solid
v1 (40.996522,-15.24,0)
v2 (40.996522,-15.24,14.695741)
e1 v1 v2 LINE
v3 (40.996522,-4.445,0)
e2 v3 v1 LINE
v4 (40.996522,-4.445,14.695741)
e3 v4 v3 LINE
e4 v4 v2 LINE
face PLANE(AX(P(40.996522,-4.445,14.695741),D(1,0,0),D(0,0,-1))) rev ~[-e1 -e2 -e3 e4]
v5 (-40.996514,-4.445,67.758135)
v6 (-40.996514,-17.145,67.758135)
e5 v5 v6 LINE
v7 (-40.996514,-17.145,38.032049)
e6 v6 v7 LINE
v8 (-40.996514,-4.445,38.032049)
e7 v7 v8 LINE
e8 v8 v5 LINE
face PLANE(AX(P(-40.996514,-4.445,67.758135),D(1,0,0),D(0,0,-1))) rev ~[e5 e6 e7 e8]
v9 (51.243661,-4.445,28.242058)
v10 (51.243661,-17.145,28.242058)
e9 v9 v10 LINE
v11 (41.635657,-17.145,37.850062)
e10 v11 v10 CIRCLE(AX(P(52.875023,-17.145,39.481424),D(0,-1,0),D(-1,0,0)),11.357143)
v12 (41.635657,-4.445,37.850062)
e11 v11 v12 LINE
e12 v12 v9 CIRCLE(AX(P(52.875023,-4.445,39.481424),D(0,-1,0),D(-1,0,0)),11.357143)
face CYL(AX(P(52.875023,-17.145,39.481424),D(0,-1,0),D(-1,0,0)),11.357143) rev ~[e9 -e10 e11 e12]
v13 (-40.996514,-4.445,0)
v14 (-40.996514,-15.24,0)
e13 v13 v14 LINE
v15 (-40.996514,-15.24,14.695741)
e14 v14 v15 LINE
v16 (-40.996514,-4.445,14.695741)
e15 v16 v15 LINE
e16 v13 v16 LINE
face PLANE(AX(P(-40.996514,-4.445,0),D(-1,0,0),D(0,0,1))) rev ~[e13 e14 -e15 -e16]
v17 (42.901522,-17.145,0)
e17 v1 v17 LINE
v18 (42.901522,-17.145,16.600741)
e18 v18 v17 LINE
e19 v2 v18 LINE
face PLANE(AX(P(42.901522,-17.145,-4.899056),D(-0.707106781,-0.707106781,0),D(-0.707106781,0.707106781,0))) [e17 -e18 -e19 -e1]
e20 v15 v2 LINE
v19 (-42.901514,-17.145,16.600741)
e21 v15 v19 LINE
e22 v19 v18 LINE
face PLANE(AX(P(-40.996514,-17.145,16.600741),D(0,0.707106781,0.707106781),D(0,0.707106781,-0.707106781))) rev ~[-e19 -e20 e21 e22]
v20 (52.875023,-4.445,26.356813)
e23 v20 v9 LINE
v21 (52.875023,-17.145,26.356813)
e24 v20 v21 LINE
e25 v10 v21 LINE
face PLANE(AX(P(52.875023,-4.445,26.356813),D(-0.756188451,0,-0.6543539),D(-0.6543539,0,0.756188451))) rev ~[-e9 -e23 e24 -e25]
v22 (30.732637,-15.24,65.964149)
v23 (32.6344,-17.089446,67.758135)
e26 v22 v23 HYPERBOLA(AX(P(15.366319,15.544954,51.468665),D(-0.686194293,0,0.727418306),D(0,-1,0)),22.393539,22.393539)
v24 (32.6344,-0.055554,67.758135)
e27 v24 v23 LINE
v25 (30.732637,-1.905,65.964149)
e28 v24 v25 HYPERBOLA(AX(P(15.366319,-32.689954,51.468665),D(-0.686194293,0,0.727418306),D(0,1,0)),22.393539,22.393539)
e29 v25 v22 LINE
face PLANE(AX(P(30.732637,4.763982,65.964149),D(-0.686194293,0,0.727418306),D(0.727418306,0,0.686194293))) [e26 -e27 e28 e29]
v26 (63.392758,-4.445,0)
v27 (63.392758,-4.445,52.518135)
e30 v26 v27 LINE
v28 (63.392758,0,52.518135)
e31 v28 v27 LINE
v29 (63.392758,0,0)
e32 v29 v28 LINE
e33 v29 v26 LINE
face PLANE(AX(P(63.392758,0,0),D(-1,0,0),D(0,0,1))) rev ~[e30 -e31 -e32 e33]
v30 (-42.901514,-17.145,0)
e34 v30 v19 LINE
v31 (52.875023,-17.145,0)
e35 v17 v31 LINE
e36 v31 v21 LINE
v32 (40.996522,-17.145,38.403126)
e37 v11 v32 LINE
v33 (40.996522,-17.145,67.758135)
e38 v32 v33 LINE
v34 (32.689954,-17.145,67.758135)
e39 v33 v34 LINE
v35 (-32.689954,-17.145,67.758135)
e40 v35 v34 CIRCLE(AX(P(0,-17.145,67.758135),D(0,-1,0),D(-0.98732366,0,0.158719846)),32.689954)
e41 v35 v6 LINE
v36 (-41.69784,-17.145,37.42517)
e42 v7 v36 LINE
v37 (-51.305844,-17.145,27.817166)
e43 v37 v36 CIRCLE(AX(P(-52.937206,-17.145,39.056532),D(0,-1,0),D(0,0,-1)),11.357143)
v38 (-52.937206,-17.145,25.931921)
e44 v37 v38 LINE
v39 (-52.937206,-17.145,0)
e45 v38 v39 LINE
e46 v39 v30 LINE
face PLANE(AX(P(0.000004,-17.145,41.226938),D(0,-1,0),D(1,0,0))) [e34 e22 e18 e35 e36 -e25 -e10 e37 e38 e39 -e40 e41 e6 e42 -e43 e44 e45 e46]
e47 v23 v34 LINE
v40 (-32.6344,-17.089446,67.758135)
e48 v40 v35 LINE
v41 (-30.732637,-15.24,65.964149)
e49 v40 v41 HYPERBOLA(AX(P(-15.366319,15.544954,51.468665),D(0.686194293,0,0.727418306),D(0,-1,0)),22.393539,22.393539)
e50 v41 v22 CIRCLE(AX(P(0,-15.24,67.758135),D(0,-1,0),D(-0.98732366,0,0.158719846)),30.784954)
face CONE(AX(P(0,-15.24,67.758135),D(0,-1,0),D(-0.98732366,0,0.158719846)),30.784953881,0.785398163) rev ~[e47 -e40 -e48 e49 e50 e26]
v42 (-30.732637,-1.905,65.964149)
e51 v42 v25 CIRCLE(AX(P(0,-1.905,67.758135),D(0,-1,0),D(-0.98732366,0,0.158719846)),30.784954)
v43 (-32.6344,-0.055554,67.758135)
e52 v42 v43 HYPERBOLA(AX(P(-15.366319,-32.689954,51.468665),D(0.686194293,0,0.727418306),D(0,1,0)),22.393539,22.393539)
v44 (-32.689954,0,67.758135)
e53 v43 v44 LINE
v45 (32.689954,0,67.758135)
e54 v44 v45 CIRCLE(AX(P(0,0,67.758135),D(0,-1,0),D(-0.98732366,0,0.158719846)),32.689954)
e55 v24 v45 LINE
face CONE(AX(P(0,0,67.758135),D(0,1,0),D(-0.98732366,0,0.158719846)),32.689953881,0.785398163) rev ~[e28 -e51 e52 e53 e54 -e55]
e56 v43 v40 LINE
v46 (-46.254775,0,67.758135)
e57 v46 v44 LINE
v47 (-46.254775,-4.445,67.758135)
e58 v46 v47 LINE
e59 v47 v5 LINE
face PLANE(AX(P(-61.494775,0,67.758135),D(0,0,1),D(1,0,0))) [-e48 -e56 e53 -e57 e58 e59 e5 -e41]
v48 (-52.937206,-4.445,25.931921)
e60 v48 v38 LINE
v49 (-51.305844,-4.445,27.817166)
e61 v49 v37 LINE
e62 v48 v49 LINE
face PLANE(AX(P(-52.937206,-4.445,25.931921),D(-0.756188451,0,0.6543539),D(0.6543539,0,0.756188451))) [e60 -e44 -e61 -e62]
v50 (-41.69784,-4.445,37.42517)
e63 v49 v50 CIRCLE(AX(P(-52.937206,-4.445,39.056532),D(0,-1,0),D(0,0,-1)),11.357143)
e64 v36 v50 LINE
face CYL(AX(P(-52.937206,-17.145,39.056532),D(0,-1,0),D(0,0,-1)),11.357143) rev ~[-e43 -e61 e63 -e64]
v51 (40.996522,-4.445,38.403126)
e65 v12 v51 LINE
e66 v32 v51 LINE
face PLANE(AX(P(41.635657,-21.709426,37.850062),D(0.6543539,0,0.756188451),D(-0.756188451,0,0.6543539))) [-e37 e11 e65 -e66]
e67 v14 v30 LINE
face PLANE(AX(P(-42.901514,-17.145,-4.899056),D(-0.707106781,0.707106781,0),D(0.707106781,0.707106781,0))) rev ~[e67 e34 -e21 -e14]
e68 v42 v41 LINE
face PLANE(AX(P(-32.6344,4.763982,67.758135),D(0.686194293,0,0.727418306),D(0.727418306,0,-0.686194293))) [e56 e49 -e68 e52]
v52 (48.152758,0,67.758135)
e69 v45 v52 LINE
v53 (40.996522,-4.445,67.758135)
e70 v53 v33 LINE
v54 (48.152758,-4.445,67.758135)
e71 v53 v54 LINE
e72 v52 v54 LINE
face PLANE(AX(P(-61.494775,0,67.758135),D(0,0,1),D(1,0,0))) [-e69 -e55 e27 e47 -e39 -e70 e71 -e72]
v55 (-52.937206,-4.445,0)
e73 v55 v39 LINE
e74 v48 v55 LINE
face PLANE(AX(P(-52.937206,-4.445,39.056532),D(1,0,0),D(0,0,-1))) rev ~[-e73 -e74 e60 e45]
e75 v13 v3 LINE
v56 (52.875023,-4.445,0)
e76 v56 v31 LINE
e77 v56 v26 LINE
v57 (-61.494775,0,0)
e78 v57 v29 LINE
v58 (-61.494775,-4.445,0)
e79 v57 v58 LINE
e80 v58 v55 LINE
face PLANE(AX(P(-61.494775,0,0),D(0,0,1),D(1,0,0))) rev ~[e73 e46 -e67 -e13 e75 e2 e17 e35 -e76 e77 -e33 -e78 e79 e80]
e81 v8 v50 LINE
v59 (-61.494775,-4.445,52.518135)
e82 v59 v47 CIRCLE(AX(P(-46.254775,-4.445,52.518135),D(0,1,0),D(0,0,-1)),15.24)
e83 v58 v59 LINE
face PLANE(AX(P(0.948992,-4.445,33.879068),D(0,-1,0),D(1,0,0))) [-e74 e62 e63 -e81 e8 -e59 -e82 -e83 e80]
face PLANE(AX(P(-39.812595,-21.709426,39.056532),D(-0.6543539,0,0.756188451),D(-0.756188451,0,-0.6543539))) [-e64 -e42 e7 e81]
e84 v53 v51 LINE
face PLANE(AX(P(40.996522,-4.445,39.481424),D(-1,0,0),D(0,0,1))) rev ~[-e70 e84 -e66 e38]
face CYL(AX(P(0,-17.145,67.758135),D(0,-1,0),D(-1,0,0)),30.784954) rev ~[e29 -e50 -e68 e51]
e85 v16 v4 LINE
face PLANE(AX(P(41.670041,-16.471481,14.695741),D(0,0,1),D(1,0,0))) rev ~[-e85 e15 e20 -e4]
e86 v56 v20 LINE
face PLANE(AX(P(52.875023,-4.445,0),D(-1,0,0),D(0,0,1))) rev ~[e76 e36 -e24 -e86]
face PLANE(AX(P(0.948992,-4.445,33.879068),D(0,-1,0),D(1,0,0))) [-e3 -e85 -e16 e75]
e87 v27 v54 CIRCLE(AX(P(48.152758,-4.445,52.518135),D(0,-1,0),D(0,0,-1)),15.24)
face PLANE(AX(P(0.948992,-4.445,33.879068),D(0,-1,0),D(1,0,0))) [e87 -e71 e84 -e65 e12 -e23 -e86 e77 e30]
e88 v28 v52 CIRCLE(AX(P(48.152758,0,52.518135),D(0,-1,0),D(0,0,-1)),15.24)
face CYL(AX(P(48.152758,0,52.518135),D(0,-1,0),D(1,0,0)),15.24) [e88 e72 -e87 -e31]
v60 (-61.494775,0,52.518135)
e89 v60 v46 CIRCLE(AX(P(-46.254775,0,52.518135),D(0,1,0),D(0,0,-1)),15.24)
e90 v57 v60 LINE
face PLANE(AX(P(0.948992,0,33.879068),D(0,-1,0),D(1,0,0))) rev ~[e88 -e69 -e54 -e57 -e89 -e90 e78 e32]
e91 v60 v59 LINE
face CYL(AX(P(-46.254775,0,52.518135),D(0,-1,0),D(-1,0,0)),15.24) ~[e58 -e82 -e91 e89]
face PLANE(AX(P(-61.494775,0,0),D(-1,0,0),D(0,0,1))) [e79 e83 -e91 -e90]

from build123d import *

# Parameters (mm, degrees)
F0_W         = 124.8875334859
F0_H         = 67.7581354976
F1_DEPTH     = 4.445
F2_R         = 15.24
F4_DEPTH     = 12.7
F6_DEPTH     = 50.8
F8_DEPTH     = 12.7
F9_T1_DEPTH  = 26.6729642247
F9_T3_DEPTH  = 19.5947973283
F9_T5_DEPTH  = 81.9930359721
F9_T7_DEPTH  = 17.2644261819
F9_T10_ANGLE = 198.2651986278
F9_T12_ANGLE = 198.2651986278
F9_T16_DEPTH = 17.2644261819
F9_T21_DEPTH = 17.2644261819
F9_T27_DEPTH = 86.8920920642
F9_T31_DEPTH = 19.5947973283
F9_T38_DEPTH = 19.5947973283
F9_T42_DEPTH = 86.8920920642


# Not quite as in the source:
# - a fillet or chamfer that OpenCascade refuses, or shapes differently, is made with other operations: its cross-section is extruded or revolved along the edge and cut away or added


with BuildPart() as f1:
    # F0 (on Front) → F1 (new body)
    with BuildSketch(Plane.XZ):
        with Locations((0.9489916265, 33.8790677488)):
            Rectangle(F0_W, F0_H)
    extrude(amount=F1_DEPTH)

    # F2
    f2_edges = [f1.edges().sort_by_distance(p)[0] for p in [
        (-61.494775, -2.2225, 67.758135),
        (63.392758, -2.2225, 67.758135),
    ]]
    fillet(f2_edges, radius=F2_R)

    # F3 (on face) → F4 (join)
    with BuildSketch(Plane.XZ.offset(4.445)):
        Polygon((40.9965217113, 67.7581354976), (-40.9965142608, 67.7581354976), (-40.9965142608, 39.0565320849), (-40.9965142608, 14.6957412362), (40.9965217113, 14.6957412362), (40.9965217113, 39.4814237952), align=None)
        Polygon((-40.9965142608, 14.6957412362), (-40.9965142608, 39.0565320849), (-52.9372058809, 39.0565320849), (-52.9372058809, 0), (-40.9965142608, 0), align=None)
        Polygon((52.8750233352, 39.4814237952), (40.9965217113, 39.4814237952), (40.9965217113, 14.6957412362), (40.9965217113, 0), (52.8750233352, 0), align=None)
    extrude(amount=F4_DEPTH)

    # F5 (on face) → F6 (cut)
    with BuildSketch(Plane.XZ.offset(17.145)):
        with BuildLine():
            ThreePointArc((-30.7849538809, 67.7581354976), (0, 36.9731816167), (30.7849538809, 67.7581354976))
            Line((30.7849538809, 67.7581354976), (-30.7849538809, 67.7581354976))
        make_face()
        with BuildLine():
            Line((-30.7849538809, 67.7581354976), (30.7849538809, 67.7581354976))
            ThreePointArc((30.7849538809, 67.7581354976), (0, 98.5430893784), (-30.7849538809, 67.7581354976))
        make_face()
    extrude(amount=-F6_DEPTH, mode=Mode.SUBTRACT)

    # F7 (on face) → F8 (cut)
    with BuildSketch(Plane.XZ.offset(17.145)):
        with BuildLine():
            ThreePointArc((-52.9372058809, 27.6993892785), (-44.9064931875, 31.0258193916), (-41.5800630744, 39.0565320849))
            Line((-41.5800630744, 39.0565320849), (-52.9372058809, 39.0565320849))
            Line((-52.9372058809, 39.0565320849), (-52.9372058809, 27.6993892785))
        make_face()
        with BuildLine():
            Line((52.8750233352, 39.4814237952), (41.5178805288, 39.4814237952))
            ThreePointArc((41.5178805288, 39.4814237952), (44.8443106419, 31.4507111019), (52.8750233352, 28.1242809888))
            Line((52.8750233352, 28.1242809888), (52.8750233352, 39.4814237952))
        make_face()
    extrude(amount=-F8_DEPTH, mode=Mode.SUBTRACT)

    # F9: chamfer of 1.905 on 11 edges, made by hand

    # F9_s2 → F9_t1 (cut)
    with BuildSketch(Plane.XZ.offset(-4.7639821123)):
        with BuildLine():
            Line((-32.6343999444, 67.7581354976), (-30.7326373381, 65.964148961))
            ThreePointArc((-30.7326373381, 65.964148961), (-30.7710738122, 66.8337968736), (-30.7849538809, 67.7581354976))
            Line((-30.7849538809, 67.7581354976), (-32.6343999444, 67.7581354976))
        make_face()
        with BuildLine():
            Line((30.7326373381, 65.964148961), (32.6343999444, 67.7581354976))
            Line((32.6343999444, 67.7581354976), (30.7849538809, 67.7581354976))
            ThreePointArc((30.7849538809, 67.7581354976), (30.7710738122, 66.8337968736), (30.7326373381, 65.964148961))
        make_face()
    extrude(amount=F9_T1_DEPTH, mode=Mode.SUBTRACT)

    # F9_s4 → F9_t3 (cut)
    with BuildSketch(Plane.XY.offset(-4.8990560921)):
        Polygon((-42.9015142608, -17.145), (-40.9965142608, -15.24), (-40.9965142608, -17.145), align=None)
        Polygon((42.9015217113, -17.145), (40.9965217113, -15.24), (40.9965217113, -17.145), align=None)
    extrude(amount=F9_T3_DEPTH, mode=Mode.SUBTRACT)

    # F9_s6 → F9_t5 (cut)
    with BuildSketch(Plane.YZ.offset(-40.9965142608)):
        Polygon((-17.145, 16.6007412362), (-15.24, 14.6957412362), (-17.145, 14.6957412362), align=None)
    extrude(amount=F9_T5_DEPTH, mode=Mode.SUBTRACT)

    # F9_s8 → F9_t7 (cut)
    with BuildSketch(Plane.XZ.offset(4.445)):
        with BuildLine():
            Line((52.8750233352, 26.356813065), (51.2436612422, 28.24205769))
            ThreePointArc((51.2436612422, 28.24205769), (52.0302167258, 28.1557452496), (52.8750233352, 28.1242809888))
            Line((52.8750233352, 28.1242809888), (52.8750233352, 26.356813065))
        make_face()
        with BuildLine():
            Line((-52.9372058809, 25.9319213547), (-51.3058437879, 27.8171659797))
            ThreePointArc((-51.3058437879, 27.8171659797), (-52.0923992715, 27.7308535393), (-52.9372058809, 27.6993892785))
            Line((-52.9372058809, 27.6993892785), (-52.9372058809, 25.9319213547))
        make_face()
    extrude(amount=F9_T7_DEPTH, mode=Mode.SUBTRACT)

    # F9_s9 → F9_t10 (revolve, cut)
    with BuildSketch(Plane(origin=(10.6182323587, 0, 66.0511732612), x_dir=(0, 1, 0), z_dir=(0.1587198459, 0, 0.9873236605))):
        Polygon((-15.24, 41.539514704), (-17.145, 43.444514704), (-17.145, 41.539514704), align=None)
    revolve(axis=Axis((0, -17.145, 67.7581354976), (0, -1, 0)), revolution_arc=F9_T10_ANGLE, mode=Mode.SUBTRACT)

    # F9_s11 → F9_t12 (revolve, cut)
    with BuildSketch(Plane(origin=(10.6182323587, 0, 66.0511732612), x_dir=(0, 1, 0), z_dir=(0.1587198459, 0, 0.9873236605))):
        Polygon((0, 43.444514704), (-1.905, 41.539514704), (0, 41.539514704), align=None)
    revolve(axis=Axis((0, 0, 67.7581354976), (0, -1, 0)), revolution_arc=F9_T12_ANGLE, mode=Mode.SUBTRACT)


with BuildPart() as f9_tool14:
    # F9_s15 → F9_t16 (new body)
    with BuildSketch(Plane.XZ.offset(21.7094261819)):
        with BuildLine():
            Line((41.63565723, 37.8500617022), (39.750412605, 39.4814237952))
            Line((39.750412605, 39.4814237952), (41.5178805288, 39.4814237952))
            ThreePointArc((41.5178805288, 39.4814237952), (41.5493447896, 38.6366171858), (41.63565723, 37.8500617022))
        make_face()
    extrude(amount=-F9_T16_DEPTH)

    split(bisect_by=Plane.YZ.offset(40.9965217113), keep=Keep.TOP)


with BuildPart() as f1_1:
    add(f1.part)

    # F9_t13: cut F9_tool14
    add(f9_tool14.part, mode=Mode.SUBTRACT)


with BuildPart() as f9_tool19:
    # F9_s20 → F9_t21 (new body)
    with BuildSketch(Plane.XZ.offset(21.7094261819)):
        with BuildLine():
            Line((-39.8125951507, 39.0565320849), (-41.6978397756, 37.4251699919))
            ThreePointArc((-41.6978397756, 37.4251699919), (-41.6115273352, 38.2117254755), (-41.5800630744, 39.0565320849))
            Line((-41.5800630744, 39.0565320849), (-39.8125951507, 39.0565320849))
        make_face()
    extrude(amount=-F9_T21_DEPTH)

    split(bisect_by=Plane.YZ.offset(-40.9965142608), keep=Keep.BOTTOM)


with BuildPart() as f1_2:
    add(f1_1.part)

    # F9_t18: cut F9_tool19
    add(f9_tool19.part, mode=Mode.SUBTRACT)


with BuildPart() as f9_tool25:
    # F9_s26 → F9_t27 (new body)
    with BuildSketch(Plane.YZ.offset(-45.8955703528)):
        Polygon((-17.145, 16.6007412362), (-15.24, 14.6957412362), (-17.145, 14.6957412362), align=None)
    extrude(amount=F9_T27_DEPTH)

    split(bisect_by=Plane.YZ.offset(-40.9965142608), keep=Keep.BOTTOM)


with BuildPart() as f9_tool29:
    # F9_s30 → F9_t31 (new body)
    with BuildSketch(Plane.XY):
        Polygon((-42.9015142608, -17.145), (-40.9965142608, -15.24), (-40.9965142608, -17.145), align=None)
    extrude(amount=F9_T31_DEPTH)

    split(bisect_by=Plane.XY.offset(14.6957412362), keep=Keep.TOP)


with BuildPart() as f9_tool25_1:
    add(f9_tool25.part)

    # F9_t33: intersect F9_tool29
    add(f9_tool29.part, mode=Mode.INTERSECT)


with BuildPart() as f1_3:
    add(f1_2.part)

    # F9_t23: cut F9_tool25
    add(f9_tool25_1.part, mode=Mode.SUBTRACT)


with BuildPart() as f9_tool36:
    # F9_s37 → F9_t38 (new body)
    with BuildSketch(Plane.XY.offset(19.5947973283)):
        Polygon((42.9015217113, -17.145), (40.9965217113, -15.24), (40.9965217113, -17.145), align=None)
    extrude(amount=-F9_T38_DEPTH)

    split(bisect_by=Plane.XY.offset(14.6957412362), keep=Keep.TOP)


with BuildPart() as f9_tool40:
    # F9_s41 → F9_t42 (new body)
    with BuildSketch(Plane.YZ.offset(-40.9965142608)):
        Polygon((-17.145, 16.6007412362), (-15.24, 14.6957412362), (-17.145, 14.6957412362), align=None)
    extrude(amount=F9_T42_DEPTH)

    split(bisect_by=Plane.YZ.offset(40.9965217113), keep=Keep.TOP)


with BuildPart() as f9_tool36_1:
    add(f9_tool36.part)

    # F9_t44: intersect F9_tool40
    add(f9_tool40.part, mode=Mode.INTERSECT)


with BuildPart() as f1_4:
    add(f1_3.part)

    # F9_t34: cut F9_tool36
    add(f9_tool36_1.part, mode=Mode.SUBTRACT)


solid = f1_4.part
